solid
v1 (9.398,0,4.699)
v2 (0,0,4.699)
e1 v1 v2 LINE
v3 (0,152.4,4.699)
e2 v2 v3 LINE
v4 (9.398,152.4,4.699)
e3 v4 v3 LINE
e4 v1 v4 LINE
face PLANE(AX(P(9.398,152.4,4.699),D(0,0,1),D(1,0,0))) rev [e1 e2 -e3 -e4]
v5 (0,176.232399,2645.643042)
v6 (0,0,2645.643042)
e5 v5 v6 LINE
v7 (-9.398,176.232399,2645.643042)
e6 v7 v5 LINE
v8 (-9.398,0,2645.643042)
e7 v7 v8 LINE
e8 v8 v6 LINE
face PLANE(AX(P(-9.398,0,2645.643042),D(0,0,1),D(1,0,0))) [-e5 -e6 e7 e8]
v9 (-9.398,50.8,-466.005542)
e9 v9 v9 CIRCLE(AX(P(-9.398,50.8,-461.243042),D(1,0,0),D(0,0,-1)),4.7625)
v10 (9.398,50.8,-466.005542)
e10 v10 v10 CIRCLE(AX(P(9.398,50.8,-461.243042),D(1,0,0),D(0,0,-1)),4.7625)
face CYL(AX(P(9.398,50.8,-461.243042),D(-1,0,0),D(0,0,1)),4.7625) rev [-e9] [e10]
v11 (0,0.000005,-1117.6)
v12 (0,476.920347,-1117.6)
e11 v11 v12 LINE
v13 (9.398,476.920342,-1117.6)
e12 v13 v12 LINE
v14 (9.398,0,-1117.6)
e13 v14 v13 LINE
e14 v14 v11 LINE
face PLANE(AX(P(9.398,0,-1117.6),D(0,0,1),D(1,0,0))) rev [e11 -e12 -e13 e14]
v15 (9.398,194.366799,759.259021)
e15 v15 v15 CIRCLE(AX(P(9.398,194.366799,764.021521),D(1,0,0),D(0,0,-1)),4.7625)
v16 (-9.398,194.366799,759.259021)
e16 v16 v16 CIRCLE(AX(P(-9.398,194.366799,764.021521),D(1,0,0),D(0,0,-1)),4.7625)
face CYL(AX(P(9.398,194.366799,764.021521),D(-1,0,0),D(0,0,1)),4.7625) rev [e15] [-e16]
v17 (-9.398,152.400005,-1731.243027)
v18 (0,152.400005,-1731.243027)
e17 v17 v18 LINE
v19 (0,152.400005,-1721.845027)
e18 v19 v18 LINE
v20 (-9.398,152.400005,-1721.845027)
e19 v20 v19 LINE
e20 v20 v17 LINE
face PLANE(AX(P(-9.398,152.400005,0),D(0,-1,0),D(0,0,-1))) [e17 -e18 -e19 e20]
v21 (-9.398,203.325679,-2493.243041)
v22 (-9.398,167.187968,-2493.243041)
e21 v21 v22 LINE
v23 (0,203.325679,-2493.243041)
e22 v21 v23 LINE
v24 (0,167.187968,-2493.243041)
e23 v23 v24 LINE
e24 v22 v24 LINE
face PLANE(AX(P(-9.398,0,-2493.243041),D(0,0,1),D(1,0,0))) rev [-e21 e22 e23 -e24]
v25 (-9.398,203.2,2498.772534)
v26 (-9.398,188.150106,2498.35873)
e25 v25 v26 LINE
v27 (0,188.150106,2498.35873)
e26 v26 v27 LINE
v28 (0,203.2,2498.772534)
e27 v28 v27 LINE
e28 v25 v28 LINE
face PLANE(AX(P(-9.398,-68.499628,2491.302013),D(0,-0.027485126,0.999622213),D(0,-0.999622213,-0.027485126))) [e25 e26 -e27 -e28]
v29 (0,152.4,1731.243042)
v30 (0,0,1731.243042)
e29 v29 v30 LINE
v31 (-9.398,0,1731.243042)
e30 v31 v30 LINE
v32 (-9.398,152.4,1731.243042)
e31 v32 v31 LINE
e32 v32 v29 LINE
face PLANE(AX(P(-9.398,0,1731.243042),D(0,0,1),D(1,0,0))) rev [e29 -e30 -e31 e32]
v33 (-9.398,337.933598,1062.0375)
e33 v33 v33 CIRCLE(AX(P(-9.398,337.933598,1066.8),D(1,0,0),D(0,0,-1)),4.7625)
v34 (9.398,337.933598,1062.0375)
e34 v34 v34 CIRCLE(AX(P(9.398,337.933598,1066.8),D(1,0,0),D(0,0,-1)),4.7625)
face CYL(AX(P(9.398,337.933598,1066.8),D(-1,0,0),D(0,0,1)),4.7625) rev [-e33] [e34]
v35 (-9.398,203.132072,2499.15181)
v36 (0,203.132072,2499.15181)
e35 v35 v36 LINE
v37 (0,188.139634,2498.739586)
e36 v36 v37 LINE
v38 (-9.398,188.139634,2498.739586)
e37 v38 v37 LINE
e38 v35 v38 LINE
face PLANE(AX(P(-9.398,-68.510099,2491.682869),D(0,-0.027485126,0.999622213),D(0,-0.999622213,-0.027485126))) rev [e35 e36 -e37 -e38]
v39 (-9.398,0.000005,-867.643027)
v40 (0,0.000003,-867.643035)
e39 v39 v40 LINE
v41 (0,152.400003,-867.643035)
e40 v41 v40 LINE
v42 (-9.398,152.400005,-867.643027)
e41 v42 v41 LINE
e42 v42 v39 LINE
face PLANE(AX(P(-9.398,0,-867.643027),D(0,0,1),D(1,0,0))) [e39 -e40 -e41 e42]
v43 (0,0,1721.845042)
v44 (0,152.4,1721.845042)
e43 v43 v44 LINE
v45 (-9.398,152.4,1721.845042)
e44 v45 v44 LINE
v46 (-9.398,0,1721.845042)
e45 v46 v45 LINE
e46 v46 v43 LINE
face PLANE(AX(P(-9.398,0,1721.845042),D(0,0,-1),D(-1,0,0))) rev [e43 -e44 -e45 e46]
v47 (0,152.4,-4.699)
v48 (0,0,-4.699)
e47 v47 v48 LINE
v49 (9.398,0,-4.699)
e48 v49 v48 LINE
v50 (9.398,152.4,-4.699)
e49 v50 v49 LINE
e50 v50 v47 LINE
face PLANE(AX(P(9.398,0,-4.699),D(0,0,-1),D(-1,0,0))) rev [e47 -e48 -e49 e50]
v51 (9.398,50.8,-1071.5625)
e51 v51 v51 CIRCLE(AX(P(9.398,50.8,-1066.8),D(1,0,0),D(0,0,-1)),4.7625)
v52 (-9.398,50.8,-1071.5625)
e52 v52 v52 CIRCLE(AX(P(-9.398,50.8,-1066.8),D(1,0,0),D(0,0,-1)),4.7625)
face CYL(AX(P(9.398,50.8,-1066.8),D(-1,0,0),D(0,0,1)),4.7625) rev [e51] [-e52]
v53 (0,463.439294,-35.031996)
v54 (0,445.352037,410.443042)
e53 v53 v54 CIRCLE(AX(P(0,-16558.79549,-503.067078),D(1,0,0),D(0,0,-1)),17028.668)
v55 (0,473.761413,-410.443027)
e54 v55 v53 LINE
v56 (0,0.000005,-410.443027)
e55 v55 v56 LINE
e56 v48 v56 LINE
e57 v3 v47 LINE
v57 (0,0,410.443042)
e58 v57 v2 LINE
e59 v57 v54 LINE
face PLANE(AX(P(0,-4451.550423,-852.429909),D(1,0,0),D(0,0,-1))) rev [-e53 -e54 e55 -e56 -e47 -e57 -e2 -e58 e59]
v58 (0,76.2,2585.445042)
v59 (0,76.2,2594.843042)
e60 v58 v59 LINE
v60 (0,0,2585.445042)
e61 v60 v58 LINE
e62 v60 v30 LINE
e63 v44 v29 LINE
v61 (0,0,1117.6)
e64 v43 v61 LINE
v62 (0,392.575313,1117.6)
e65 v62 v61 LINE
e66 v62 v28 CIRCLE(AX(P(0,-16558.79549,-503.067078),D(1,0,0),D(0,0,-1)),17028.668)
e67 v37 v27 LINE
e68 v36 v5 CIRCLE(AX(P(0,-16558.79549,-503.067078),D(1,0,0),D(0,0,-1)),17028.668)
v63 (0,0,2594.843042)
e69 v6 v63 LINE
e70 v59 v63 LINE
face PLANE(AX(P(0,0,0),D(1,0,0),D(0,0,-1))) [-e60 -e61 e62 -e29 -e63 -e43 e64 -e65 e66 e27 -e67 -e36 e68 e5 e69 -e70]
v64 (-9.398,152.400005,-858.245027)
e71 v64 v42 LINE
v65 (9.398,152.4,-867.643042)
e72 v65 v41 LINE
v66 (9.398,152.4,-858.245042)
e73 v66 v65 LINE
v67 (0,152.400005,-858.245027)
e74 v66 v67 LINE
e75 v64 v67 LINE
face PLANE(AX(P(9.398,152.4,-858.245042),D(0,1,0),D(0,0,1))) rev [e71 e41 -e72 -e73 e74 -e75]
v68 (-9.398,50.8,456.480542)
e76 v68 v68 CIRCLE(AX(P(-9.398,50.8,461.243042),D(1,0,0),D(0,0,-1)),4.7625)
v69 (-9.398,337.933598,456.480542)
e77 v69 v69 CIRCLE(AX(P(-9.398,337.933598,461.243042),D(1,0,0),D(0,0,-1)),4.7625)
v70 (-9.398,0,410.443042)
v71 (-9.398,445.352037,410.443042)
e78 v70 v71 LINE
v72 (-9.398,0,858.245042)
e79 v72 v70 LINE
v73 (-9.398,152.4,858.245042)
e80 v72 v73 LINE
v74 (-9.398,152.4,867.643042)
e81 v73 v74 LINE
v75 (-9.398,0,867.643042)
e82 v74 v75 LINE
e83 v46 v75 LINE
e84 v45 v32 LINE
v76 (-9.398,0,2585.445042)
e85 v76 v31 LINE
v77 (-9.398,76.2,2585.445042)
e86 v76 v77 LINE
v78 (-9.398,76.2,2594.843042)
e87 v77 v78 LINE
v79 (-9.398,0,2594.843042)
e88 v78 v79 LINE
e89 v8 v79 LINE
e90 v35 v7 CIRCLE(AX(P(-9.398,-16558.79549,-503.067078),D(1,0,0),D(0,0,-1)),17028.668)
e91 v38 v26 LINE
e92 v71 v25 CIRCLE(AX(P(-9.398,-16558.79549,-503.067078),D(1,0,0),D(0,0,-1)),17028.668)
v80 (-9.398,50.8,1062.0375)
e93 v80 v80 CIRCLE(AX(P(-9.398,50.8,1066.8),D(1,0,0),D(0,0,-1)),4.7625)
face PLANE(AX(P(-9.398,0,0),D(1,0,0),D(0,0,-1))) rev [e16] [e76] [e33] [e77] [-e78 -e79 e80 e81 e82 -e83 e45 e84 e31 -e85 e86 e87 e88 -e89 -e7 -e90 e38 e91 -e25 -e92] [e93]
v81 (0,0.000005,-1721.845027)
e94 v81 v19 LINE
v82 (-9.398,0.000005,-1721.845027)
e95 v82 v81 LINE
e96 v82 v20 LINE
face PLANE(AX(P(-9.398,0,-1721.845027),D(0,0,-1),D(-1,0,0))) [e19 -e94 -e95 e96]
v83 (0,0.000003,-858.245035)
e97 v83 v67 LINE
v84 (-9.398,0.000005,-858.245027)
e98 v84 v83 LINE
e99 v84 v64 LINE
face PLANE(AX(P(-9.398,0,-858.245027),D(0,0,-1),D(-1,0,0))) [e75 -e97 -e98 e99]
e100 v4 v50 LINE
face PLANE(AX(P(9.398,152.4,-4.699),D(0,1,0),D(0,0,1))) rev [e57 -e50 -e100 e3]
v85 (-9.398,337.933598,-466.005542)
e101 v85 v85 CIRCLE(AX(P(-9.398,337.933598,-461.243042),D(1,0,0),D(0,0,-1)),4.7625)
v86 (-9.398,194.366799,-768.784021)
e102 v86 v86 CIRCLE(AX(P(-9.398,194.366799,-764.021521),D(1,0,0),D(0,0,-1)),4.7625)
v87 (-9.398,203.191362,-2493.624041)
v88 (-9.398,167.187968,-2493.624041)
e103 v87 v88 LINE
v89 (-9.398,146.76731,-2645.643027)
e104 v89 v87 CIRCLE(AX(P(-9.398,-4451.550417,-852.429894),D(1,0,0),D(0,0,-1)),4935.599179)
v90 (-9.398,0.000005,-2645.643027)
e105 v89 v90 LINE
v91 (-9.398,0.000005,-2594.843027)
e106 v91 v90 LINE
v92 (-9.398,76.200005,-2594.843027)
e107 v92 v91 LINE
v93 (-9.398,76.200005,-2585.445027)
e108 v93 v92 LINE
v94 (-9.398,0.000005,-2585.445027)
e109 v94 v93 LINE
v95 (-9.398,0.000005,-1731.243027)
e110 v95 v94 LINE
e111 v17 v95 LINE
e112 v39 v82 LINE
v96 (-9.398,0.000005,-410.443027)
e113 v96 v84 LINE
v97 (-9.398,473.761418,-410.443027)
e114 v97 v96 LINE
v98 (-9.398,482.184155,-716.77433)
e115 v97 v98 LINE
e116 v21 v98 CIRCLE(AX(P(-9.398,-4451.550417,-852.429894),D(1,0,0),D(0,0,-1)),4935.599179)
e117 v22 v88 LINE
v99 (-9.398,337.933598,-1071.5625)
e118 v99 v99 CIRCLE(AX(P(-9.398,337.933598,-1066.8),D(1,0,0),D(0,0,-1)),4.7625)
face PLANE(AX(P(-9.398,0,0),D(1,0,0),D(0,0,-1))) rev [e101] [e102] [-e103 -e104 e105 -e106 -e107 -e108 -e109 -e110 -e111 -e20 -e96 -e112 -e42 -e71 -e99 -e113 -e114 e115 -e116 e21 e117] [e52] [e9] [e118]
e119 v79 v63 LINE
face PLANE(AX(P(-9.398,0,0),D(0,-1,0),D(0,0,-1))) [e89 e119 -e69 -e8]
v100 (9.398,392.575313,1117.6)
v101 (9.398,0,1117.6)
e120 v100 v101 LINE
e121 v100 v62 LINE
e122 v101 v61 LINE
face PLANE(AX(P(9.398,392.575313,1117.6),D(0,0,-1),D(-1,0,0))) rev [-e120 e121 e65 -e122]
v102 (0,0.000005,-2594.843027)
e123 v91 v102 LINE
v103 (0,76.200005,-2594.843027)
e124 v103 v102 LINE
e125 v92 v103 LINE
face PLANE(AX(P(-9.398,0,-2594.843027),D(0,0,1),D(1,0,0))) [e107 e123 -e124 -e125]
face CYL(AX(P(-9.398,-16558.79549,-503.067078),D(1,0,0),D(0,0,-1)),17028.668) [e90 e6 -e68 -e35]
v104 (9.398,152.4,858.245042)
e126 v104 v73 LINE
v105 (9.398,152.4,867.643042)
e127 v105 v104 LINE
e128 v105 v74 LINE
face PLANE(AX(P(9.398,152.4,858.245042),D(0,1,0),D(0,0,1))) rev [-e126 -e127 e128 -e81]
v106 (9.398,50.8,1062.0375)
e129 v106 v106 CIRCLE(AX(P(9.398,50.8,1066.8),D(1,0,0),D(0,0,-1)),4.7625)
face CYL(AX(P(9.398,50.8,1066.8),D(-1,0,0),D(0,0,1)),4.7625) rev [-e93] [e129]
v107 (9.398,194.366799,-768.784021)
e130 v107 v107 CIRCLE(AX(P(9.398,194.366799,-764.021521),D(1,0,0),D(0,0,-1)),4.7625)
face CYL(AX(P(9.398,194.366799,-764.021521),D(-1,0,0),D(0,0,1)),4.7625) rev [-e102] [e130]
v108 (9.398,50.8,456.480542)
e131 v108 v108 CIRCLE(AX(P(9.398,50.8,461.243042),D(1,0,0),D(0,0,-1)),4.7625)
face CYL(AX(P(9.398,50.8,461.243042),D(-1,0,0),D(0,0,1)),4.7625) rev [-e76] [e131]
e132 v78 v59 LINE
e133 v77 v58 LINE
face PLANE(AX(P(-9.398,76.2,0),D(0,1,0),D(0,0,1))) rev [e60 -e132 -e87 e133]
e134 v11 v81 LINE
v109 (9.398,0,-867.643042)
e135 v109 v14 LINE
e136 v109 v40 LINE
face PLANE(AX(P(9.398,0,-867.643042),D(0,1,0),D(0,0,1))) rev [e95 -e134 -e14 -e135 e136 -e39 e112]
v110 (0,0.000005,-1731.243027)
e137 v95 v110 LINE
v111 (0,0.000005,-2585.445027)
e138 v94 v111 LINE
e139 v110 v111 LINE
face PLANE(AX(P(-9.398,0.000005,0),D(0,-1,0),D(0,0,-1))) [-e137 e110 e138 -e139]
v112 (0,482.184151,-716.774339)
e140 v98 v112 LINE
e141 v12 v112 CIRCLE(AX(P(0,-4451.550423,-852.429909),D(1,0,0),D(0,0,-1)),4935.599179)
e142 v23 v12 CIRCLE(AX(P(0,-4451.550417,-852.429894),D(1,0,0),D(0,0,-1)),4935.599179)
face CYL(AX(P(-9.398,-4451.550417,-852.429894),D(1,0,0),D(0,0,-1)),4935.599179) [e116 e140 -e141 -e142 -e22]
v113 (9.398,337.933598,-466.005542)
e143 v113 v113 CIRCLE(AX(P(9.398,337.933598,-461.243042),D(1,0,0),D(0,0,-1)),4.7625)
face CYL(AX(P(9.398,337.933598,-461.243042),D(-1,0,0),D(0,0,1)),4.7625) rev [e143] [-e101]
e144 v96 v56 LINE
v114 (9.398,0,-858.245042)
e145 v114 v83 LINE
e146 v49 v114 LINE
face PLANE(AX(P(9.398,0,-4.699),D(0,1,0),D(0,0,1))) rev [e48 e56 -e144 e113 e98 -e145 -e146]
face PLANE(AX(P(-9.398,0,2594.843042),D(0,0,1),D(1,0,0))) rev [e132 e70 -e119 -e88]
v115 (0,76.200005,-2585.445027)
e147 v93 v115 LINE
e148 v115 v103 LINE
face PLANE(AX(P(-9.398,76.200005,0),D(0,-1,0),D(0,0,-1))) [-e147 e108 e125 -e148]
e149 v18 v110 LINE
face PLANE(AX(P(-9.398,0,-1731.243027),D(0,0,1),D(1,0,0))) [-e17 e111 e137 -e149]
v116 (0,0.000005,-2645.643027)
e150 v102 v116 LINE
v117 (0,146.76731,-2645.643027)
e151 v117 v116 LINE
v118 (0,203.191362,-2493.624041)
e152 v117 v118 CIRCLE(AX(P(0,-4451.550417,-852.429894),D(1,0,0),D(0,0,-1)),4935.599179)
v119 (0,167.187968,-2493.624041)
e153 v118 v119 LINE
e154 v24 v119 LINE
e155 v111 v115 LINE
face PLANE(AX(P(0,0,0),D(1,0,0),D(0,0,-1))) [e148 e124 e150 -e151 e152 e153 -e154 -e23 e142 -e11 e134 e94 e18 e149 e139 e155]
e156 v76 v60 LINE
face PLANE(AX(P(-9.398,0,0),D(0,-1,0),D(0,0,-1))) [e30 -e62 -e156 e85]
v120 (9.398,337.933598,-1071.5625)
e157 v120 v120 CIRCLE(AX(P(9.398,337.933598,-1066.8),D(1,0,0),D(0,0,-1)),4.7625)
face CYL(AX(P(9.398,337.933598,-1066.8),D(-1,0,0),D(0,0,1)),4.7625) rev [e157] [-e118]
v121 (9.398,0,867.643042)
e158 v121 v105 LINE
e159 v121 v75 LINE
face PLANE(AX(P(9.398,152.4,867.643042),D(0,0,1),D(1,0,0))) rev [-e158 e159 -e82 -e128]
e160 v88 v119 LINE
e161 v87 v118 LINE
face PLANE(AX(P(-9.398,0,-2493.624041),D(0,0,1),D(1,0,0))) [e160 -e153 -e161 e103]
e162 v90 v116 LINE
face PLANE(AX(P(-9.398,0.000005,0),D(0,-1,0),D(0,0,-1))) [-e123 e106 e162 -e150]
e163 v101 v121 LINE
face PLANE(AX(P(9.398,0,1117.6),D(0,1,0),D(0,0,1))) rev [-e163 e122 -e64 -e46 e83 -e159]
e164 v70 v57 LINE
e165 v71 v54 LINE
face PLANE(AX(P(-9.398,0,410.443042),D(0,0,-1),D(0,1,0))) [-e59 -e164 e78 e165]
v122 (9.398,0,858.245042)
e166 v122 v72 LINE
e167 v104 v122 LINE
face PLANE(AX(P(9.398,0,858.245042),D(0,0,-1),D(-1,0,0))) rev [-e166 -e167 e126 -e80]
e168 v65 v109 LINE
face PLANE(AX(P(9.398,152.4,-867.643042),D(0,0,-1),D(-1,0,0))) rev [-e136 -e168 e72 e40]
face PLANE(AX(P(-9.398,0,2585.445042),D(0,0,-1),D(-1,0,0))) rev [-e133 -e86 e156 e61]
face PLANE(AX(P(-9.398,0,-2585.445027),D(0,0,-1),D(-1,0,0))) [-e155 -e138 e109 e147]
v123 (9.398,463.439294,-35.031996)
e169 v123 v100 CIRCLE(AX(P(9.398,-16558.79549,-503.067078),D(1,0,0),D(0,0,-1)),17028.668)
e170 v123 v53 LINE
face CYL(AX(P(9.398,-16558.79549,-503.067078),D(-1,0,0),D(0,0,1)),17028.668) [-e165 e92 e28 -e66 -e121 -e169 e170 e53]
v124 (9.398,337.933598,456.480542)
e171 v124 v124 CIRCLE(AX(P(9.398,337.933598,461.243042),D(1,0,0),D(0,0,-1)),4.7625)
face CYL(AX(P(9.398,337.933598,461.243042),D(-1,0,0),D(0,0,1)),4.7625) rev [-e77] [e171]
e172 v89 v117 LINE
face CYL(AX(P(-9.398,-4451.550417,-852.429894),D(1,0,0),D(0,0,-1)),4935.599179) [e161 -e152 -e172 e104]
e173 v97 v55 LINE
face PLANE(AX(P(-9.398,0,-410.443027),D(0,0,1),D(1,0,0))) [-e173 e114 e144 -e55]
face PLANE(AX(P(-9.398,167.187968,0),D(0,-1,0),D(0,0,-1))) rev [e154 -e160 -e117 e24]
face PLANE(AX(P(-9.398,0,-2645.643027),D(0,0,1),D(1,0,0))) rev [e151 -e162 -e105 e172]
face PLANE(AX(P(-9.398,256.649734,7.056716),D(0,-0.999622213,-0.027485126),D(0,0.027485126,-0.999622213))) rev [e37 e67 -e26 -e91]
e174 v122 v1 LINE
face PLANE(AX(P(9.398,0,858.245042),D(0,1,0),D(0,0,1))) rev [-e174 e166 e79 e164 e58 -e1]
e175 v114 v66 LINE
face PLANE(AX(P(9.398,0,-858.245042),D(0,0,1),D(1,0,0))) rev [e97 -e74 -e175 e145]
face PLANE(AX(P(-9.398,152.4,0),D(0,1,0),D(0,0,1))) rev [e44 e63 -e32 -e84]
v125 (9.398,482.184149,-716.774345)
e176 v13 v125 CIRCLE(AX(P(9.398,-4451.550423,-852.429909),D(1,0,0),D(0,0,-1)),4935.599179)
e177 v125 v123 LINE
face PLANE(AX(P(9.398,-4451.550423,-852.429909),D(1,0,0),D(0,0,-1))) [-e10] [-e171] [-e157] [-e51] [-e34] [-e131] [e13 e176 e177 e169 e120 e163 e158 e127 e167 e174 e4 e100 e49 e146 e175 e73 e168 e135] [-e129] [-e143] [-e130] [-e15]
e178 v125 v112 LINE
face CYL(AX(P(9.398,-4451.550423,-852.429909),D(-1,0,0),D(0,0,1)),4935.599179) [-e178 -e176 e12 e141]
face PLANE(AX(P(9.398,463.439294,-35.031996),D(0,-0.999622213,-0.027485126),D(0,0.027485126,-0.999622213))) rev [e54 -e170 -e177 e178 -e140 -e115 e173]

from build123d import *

# Parameters (mm, degrees)
SKETCH1_R               = 4.7625
BOSS_EXTRUDE1_DEPTH     = 9.398
BOSS_EXTRUDE2_START     = -9.398
SKETCH2_R               = 4.7625
BOSS_EXTRUDE2_DEPTH     = 9.398
BOSS_EXTRUDE3_START     = -9.398
BOSS_EXTRUDE3_OUTLINE_R = 4.7625
BOSS_EXTRUDE3_DEPTH     = 9.398


# Read off the part's stored shape, not the designer's step: Boss-Extrude3
with BuildPart() as part:
    # Sketch1 → Boss-Extrude1 (new body)
    with BuildSketch(Plane(origin=(0, 0, 0), x_dir=(0, 0, -1), z_dir=(1, 0, 0))):
        with BuildLine():
            Line((-1117.6, 0), (-867.643042413, 0))
            Line((-867.643042413, 0), (-867.643042413, 152.4))
            Line((-867.643042413, 152.4), (-858.245042413, 152.4))
            Line((-858.245042413, 152.4), (-858.245042413, 0))
            Line((-858.245042413, 0), (-4.699, 0))
            Line((-4.699, 0), (-4.699, 152.4))
            Line((-4.699, 152.4), (4.699, 152.4))
            Line((4.699, 152.4), (4.699, 0))
            Line((4.699, 0), (858.245042413, 0))
            Line((858.245042413, 0), (858.245042413, 152.4))
            Line((858.245042413, 152.4), (867.643042413, 152.4))
            Line((867.643042413, 152.4), (867.643042413, 0))
            Line((867.643042413, 0), (1117.6, 0))
            Line((1117.6, 0), (1117.6, 476.920342363))
            ThreePointArc((1117.6, 476.920342363), (917.240633935, 483.623214487), (716.77434461, 482.184149316))
            Line((716.77434461, 482.184149316), (35.031995638, 463.439293515))
            ThreePointArc((35.031995638, 463.439293515), (-541.884884831, 437.78090817), (-1117.6, 392.575312556))
            Line((-1117.6, 392.575312556), (-1117.6, 0))
        make_face()
        with Locations((-1066.8, 337.933597897)):
            Circle(SKETCH1_R, mode=Mode.SUBTRACT)
        with Locations((-1066.8, 50.8)):
            Circle(SKETCH1_R, mode=Mode.SUBTRACT)
        with Locations((-461.243042413, 50.8)):
            Circle(SKETCH1_R, mode=Mode.SUBTRACT)
        with Locations((-461.243042413, 337.933597897)):
            Circle(SKETCH1_R, mode=Mode.SUBTRACT)
        with Locations((-764.021521207, 194.366798948)):
            Circle(SKETCH1_R, mode=Mode.SUBTRACT)
        with Locations((1066.8, 337.933597897)):
            Circle(SKETCH1_R, mode=Mode.SUBTRACT)
        with Locations((1066.8, 50.8)):
            Circle(SKETCH1_R, mode=Mode.SUBTRACT)
        with Locations((461.243042413, 50.8)):
            Circle(SKETCH1_R, mode=Mode.SUBTRACT)
        with Locations((461.243042413, 337.933597897)):
            Circle(SKETCH1_R, mode=Mode.SUBTRACT)
        with Locations((764.021521207, 194.366798948)):
            Circle(SKETCH1_R, mode=Mode.SUBTRACT)
    extrude(amount=BOSS_EXTRUDE1_DEPTH)

    # Sketch2 → Boss-Extrude2 (add)
    with BuildSketch(Plane(origin=(0, 0, 0), x_dir=(0, 0, -1), z_dir=(1, 0, 0)).offset(BOSS_EXTRUDE2_START)):
        with BuildLine():
            Line((-2499.151810434, 203.132072467), (-2498.739585654, 188.139634391))
            Line((-2498.739585654, 188.139634391), (-2498.358729591, 188.150106224))
            Line((-2498.358729591, 188.150106224), (-2498.772534145, 203.199999989))
            ThreePointArc((-2498.772534145, 203.199999989), (-1458.348299788, 356.534349508), (-410.443042359, 445.352037108))
            Line((-410.443042359, 445.352037108), (-410.443042359, 9e-09))
            Line((-410.443042359, 9e-09), (-858.245042361, 9e-09))
            Line((-858.245042361, 9e-09), (-858.245042361, 152.400000009))
            Line((-858.245042361, 152.400000009), (-867.643042361, 152.400000009))
            Line((-867.643042361, 152.400000009), (-867.643042361, 9e-09))
            Line((-867.643042361, 9e-09), (-1721.845042361, 9e-09))
            Line((-1721.845042361, 9e-09), (-1721.845042361, 152.400000009))
            Line((-1721.845042361, 152.400000009), (-1731.243042361, 152.400000009))
            Line((-1731.243042361, 152.400000009), (-1731.243042361, 9e-09))
            Line((-1731.243042361, 9e-09), (-2585.445042361, 9e-09))
            Line((-2585.445042361, 9e-09), (-2585.445042361, 76.200000009))
            Line((-2585.445042361, 76.200000009), (-2594.843042361, 76.200000009))
            Line((-2594.843042361, 76.200000009), (-2594.843042361, 9e-09))
            Line((-2594.843042361, 9e-09), (-2645.643042361, 9e-09))
            Line((-2645.643042361, 9e-09), (-2645.643042361, 176.232398874))
            ThreePointArc((-2645.643042361, 176.232398874), (-2572.426836141, 189.842396334), (-2499.151810434, 203.132072467))
        make_face()
        with Locations((-1066.8, 337.933597897)):
            Circle(SKETCH2_R, mode=Mode.SUBTRACT)
        with Locations((-1066.8, 50.8)):
            Circle(SKETCH2_R, mode=Mode.SUBTRACT)
        with Locations((-461.243042413, 50.8)):
            Circle(SKETCH2_R, mode=Mode.SUBTRACT)
        with Locations((-461.243042413, 337.933597897)):
            Circle(SKETCH2_R, mode=Mode.SUBTRACT)
        with Locations((-764.021521207, 194.366798948)):
            Circle(SKETCH2_R, mode=Mode.SUBTRACT)
    extrude(amount=BOSS_EXTRUDE2_DEPTH)

    # Boss-Extrude3 outline → Boss-Extrude3 (add)
    with BuildSketch(Plane(origin=(0, 0, 0), x_dir=(0, 0, -1), z_dir=(1, 0, 0)).offset(BOSS_EXTRUDE3_START)):
        with BuildLine():
            Line((410.443027364, 0), (858.245042413, 0))
            Line((858.245042413, 0), (858.245027364, 152.400005306))
            Line((858.245027364, 152.400005306), (867.643042413, 152.4))
            Line((867.643042413, 152.4), (867.643027364, 2.653e-06))
            Line((867.643027364, 2.653e-06), (1721.845027364, 0))
            Line((1721.845027364, 0), (1721.845027364, 152.400005306))
            Line((1721.845027364, 152.400005306), (1731.243027364, 152.400005306))
            Line((1731.243027364, 152.400005306), (1731.243027364, 5.306e-06))
            Line((1731.243027364, 5.306e-06), (2585.445027364, 5.306e-06))
            Line((2585.445027364, 5.306e-06), (2585.445027364, 76.200005306))
            Line((2585.445027364, 76.200005306), (2594.843027364, 76.200005306))
            Line((2594.843027364, 76.200005306), (2594.843027364, 5.306e-06))
            Line((2594.843027364, 5.306e-06), (2645.643026542, 5.306e-06))
            Line((2645.643026542, 5.306e-06), (2645.643026542, 146.767309802))
            ThreePointArc((2645.643026542, 146.767309802), (2569.865266677, 175.603675529), (2493.624041275, 203.19136169))
            Line((2493.624041275, 203.19136169), (2493.624041275, 167.187967798))
            Line((2493.624041275, 167.187967798), (2493.243041275, 167.187967798))
            Line((2493.243041275, 167.187967798), (2493.243041275, 203.325679209))
            ThreePointArc((2493.243041275, 203.325679209), (1617.815646166, 424.341696828), (716.774329561, 482.184154622))
            Line((716.774329561, 482.184154622), (410.443027521, 473.761412523))
            Line((410.443027521, 473.761412523), (410.443027364, 0))
        make_face()
        with Locations((461.243042413, 50.8)):
            Circle(BOSS_EXTRUDE3_OUTLINE_R, mode=Mode.SUBTRACT)
        with Locations((1066.8, 50.8)):
            Circle(BOSS_EXTRUDE3_OUTLINE_R, mode=Mode.SUBTRACT)
        with Locations((764.021521207, 194.366798948)):
            Circle(BOSS_EXTRUDE3_OUTLINE_R, mode=Mode.SUBTRACT)
        with Locations((461.243042413, 337.933597897)):
            Circle(BOSS_EXTRUDE3_OUTLINE_R, mode=Mode.SUBTRACT)
        with Locations((1066.8, 337.933597897)):
            Circle(BOSS_EXTRUDE3_OUTLINE_R, mode=Mode.SUBTRACT)
    extrude(amount=BOSS_EXTRUDE3_DEPTH)


solid = part.part
